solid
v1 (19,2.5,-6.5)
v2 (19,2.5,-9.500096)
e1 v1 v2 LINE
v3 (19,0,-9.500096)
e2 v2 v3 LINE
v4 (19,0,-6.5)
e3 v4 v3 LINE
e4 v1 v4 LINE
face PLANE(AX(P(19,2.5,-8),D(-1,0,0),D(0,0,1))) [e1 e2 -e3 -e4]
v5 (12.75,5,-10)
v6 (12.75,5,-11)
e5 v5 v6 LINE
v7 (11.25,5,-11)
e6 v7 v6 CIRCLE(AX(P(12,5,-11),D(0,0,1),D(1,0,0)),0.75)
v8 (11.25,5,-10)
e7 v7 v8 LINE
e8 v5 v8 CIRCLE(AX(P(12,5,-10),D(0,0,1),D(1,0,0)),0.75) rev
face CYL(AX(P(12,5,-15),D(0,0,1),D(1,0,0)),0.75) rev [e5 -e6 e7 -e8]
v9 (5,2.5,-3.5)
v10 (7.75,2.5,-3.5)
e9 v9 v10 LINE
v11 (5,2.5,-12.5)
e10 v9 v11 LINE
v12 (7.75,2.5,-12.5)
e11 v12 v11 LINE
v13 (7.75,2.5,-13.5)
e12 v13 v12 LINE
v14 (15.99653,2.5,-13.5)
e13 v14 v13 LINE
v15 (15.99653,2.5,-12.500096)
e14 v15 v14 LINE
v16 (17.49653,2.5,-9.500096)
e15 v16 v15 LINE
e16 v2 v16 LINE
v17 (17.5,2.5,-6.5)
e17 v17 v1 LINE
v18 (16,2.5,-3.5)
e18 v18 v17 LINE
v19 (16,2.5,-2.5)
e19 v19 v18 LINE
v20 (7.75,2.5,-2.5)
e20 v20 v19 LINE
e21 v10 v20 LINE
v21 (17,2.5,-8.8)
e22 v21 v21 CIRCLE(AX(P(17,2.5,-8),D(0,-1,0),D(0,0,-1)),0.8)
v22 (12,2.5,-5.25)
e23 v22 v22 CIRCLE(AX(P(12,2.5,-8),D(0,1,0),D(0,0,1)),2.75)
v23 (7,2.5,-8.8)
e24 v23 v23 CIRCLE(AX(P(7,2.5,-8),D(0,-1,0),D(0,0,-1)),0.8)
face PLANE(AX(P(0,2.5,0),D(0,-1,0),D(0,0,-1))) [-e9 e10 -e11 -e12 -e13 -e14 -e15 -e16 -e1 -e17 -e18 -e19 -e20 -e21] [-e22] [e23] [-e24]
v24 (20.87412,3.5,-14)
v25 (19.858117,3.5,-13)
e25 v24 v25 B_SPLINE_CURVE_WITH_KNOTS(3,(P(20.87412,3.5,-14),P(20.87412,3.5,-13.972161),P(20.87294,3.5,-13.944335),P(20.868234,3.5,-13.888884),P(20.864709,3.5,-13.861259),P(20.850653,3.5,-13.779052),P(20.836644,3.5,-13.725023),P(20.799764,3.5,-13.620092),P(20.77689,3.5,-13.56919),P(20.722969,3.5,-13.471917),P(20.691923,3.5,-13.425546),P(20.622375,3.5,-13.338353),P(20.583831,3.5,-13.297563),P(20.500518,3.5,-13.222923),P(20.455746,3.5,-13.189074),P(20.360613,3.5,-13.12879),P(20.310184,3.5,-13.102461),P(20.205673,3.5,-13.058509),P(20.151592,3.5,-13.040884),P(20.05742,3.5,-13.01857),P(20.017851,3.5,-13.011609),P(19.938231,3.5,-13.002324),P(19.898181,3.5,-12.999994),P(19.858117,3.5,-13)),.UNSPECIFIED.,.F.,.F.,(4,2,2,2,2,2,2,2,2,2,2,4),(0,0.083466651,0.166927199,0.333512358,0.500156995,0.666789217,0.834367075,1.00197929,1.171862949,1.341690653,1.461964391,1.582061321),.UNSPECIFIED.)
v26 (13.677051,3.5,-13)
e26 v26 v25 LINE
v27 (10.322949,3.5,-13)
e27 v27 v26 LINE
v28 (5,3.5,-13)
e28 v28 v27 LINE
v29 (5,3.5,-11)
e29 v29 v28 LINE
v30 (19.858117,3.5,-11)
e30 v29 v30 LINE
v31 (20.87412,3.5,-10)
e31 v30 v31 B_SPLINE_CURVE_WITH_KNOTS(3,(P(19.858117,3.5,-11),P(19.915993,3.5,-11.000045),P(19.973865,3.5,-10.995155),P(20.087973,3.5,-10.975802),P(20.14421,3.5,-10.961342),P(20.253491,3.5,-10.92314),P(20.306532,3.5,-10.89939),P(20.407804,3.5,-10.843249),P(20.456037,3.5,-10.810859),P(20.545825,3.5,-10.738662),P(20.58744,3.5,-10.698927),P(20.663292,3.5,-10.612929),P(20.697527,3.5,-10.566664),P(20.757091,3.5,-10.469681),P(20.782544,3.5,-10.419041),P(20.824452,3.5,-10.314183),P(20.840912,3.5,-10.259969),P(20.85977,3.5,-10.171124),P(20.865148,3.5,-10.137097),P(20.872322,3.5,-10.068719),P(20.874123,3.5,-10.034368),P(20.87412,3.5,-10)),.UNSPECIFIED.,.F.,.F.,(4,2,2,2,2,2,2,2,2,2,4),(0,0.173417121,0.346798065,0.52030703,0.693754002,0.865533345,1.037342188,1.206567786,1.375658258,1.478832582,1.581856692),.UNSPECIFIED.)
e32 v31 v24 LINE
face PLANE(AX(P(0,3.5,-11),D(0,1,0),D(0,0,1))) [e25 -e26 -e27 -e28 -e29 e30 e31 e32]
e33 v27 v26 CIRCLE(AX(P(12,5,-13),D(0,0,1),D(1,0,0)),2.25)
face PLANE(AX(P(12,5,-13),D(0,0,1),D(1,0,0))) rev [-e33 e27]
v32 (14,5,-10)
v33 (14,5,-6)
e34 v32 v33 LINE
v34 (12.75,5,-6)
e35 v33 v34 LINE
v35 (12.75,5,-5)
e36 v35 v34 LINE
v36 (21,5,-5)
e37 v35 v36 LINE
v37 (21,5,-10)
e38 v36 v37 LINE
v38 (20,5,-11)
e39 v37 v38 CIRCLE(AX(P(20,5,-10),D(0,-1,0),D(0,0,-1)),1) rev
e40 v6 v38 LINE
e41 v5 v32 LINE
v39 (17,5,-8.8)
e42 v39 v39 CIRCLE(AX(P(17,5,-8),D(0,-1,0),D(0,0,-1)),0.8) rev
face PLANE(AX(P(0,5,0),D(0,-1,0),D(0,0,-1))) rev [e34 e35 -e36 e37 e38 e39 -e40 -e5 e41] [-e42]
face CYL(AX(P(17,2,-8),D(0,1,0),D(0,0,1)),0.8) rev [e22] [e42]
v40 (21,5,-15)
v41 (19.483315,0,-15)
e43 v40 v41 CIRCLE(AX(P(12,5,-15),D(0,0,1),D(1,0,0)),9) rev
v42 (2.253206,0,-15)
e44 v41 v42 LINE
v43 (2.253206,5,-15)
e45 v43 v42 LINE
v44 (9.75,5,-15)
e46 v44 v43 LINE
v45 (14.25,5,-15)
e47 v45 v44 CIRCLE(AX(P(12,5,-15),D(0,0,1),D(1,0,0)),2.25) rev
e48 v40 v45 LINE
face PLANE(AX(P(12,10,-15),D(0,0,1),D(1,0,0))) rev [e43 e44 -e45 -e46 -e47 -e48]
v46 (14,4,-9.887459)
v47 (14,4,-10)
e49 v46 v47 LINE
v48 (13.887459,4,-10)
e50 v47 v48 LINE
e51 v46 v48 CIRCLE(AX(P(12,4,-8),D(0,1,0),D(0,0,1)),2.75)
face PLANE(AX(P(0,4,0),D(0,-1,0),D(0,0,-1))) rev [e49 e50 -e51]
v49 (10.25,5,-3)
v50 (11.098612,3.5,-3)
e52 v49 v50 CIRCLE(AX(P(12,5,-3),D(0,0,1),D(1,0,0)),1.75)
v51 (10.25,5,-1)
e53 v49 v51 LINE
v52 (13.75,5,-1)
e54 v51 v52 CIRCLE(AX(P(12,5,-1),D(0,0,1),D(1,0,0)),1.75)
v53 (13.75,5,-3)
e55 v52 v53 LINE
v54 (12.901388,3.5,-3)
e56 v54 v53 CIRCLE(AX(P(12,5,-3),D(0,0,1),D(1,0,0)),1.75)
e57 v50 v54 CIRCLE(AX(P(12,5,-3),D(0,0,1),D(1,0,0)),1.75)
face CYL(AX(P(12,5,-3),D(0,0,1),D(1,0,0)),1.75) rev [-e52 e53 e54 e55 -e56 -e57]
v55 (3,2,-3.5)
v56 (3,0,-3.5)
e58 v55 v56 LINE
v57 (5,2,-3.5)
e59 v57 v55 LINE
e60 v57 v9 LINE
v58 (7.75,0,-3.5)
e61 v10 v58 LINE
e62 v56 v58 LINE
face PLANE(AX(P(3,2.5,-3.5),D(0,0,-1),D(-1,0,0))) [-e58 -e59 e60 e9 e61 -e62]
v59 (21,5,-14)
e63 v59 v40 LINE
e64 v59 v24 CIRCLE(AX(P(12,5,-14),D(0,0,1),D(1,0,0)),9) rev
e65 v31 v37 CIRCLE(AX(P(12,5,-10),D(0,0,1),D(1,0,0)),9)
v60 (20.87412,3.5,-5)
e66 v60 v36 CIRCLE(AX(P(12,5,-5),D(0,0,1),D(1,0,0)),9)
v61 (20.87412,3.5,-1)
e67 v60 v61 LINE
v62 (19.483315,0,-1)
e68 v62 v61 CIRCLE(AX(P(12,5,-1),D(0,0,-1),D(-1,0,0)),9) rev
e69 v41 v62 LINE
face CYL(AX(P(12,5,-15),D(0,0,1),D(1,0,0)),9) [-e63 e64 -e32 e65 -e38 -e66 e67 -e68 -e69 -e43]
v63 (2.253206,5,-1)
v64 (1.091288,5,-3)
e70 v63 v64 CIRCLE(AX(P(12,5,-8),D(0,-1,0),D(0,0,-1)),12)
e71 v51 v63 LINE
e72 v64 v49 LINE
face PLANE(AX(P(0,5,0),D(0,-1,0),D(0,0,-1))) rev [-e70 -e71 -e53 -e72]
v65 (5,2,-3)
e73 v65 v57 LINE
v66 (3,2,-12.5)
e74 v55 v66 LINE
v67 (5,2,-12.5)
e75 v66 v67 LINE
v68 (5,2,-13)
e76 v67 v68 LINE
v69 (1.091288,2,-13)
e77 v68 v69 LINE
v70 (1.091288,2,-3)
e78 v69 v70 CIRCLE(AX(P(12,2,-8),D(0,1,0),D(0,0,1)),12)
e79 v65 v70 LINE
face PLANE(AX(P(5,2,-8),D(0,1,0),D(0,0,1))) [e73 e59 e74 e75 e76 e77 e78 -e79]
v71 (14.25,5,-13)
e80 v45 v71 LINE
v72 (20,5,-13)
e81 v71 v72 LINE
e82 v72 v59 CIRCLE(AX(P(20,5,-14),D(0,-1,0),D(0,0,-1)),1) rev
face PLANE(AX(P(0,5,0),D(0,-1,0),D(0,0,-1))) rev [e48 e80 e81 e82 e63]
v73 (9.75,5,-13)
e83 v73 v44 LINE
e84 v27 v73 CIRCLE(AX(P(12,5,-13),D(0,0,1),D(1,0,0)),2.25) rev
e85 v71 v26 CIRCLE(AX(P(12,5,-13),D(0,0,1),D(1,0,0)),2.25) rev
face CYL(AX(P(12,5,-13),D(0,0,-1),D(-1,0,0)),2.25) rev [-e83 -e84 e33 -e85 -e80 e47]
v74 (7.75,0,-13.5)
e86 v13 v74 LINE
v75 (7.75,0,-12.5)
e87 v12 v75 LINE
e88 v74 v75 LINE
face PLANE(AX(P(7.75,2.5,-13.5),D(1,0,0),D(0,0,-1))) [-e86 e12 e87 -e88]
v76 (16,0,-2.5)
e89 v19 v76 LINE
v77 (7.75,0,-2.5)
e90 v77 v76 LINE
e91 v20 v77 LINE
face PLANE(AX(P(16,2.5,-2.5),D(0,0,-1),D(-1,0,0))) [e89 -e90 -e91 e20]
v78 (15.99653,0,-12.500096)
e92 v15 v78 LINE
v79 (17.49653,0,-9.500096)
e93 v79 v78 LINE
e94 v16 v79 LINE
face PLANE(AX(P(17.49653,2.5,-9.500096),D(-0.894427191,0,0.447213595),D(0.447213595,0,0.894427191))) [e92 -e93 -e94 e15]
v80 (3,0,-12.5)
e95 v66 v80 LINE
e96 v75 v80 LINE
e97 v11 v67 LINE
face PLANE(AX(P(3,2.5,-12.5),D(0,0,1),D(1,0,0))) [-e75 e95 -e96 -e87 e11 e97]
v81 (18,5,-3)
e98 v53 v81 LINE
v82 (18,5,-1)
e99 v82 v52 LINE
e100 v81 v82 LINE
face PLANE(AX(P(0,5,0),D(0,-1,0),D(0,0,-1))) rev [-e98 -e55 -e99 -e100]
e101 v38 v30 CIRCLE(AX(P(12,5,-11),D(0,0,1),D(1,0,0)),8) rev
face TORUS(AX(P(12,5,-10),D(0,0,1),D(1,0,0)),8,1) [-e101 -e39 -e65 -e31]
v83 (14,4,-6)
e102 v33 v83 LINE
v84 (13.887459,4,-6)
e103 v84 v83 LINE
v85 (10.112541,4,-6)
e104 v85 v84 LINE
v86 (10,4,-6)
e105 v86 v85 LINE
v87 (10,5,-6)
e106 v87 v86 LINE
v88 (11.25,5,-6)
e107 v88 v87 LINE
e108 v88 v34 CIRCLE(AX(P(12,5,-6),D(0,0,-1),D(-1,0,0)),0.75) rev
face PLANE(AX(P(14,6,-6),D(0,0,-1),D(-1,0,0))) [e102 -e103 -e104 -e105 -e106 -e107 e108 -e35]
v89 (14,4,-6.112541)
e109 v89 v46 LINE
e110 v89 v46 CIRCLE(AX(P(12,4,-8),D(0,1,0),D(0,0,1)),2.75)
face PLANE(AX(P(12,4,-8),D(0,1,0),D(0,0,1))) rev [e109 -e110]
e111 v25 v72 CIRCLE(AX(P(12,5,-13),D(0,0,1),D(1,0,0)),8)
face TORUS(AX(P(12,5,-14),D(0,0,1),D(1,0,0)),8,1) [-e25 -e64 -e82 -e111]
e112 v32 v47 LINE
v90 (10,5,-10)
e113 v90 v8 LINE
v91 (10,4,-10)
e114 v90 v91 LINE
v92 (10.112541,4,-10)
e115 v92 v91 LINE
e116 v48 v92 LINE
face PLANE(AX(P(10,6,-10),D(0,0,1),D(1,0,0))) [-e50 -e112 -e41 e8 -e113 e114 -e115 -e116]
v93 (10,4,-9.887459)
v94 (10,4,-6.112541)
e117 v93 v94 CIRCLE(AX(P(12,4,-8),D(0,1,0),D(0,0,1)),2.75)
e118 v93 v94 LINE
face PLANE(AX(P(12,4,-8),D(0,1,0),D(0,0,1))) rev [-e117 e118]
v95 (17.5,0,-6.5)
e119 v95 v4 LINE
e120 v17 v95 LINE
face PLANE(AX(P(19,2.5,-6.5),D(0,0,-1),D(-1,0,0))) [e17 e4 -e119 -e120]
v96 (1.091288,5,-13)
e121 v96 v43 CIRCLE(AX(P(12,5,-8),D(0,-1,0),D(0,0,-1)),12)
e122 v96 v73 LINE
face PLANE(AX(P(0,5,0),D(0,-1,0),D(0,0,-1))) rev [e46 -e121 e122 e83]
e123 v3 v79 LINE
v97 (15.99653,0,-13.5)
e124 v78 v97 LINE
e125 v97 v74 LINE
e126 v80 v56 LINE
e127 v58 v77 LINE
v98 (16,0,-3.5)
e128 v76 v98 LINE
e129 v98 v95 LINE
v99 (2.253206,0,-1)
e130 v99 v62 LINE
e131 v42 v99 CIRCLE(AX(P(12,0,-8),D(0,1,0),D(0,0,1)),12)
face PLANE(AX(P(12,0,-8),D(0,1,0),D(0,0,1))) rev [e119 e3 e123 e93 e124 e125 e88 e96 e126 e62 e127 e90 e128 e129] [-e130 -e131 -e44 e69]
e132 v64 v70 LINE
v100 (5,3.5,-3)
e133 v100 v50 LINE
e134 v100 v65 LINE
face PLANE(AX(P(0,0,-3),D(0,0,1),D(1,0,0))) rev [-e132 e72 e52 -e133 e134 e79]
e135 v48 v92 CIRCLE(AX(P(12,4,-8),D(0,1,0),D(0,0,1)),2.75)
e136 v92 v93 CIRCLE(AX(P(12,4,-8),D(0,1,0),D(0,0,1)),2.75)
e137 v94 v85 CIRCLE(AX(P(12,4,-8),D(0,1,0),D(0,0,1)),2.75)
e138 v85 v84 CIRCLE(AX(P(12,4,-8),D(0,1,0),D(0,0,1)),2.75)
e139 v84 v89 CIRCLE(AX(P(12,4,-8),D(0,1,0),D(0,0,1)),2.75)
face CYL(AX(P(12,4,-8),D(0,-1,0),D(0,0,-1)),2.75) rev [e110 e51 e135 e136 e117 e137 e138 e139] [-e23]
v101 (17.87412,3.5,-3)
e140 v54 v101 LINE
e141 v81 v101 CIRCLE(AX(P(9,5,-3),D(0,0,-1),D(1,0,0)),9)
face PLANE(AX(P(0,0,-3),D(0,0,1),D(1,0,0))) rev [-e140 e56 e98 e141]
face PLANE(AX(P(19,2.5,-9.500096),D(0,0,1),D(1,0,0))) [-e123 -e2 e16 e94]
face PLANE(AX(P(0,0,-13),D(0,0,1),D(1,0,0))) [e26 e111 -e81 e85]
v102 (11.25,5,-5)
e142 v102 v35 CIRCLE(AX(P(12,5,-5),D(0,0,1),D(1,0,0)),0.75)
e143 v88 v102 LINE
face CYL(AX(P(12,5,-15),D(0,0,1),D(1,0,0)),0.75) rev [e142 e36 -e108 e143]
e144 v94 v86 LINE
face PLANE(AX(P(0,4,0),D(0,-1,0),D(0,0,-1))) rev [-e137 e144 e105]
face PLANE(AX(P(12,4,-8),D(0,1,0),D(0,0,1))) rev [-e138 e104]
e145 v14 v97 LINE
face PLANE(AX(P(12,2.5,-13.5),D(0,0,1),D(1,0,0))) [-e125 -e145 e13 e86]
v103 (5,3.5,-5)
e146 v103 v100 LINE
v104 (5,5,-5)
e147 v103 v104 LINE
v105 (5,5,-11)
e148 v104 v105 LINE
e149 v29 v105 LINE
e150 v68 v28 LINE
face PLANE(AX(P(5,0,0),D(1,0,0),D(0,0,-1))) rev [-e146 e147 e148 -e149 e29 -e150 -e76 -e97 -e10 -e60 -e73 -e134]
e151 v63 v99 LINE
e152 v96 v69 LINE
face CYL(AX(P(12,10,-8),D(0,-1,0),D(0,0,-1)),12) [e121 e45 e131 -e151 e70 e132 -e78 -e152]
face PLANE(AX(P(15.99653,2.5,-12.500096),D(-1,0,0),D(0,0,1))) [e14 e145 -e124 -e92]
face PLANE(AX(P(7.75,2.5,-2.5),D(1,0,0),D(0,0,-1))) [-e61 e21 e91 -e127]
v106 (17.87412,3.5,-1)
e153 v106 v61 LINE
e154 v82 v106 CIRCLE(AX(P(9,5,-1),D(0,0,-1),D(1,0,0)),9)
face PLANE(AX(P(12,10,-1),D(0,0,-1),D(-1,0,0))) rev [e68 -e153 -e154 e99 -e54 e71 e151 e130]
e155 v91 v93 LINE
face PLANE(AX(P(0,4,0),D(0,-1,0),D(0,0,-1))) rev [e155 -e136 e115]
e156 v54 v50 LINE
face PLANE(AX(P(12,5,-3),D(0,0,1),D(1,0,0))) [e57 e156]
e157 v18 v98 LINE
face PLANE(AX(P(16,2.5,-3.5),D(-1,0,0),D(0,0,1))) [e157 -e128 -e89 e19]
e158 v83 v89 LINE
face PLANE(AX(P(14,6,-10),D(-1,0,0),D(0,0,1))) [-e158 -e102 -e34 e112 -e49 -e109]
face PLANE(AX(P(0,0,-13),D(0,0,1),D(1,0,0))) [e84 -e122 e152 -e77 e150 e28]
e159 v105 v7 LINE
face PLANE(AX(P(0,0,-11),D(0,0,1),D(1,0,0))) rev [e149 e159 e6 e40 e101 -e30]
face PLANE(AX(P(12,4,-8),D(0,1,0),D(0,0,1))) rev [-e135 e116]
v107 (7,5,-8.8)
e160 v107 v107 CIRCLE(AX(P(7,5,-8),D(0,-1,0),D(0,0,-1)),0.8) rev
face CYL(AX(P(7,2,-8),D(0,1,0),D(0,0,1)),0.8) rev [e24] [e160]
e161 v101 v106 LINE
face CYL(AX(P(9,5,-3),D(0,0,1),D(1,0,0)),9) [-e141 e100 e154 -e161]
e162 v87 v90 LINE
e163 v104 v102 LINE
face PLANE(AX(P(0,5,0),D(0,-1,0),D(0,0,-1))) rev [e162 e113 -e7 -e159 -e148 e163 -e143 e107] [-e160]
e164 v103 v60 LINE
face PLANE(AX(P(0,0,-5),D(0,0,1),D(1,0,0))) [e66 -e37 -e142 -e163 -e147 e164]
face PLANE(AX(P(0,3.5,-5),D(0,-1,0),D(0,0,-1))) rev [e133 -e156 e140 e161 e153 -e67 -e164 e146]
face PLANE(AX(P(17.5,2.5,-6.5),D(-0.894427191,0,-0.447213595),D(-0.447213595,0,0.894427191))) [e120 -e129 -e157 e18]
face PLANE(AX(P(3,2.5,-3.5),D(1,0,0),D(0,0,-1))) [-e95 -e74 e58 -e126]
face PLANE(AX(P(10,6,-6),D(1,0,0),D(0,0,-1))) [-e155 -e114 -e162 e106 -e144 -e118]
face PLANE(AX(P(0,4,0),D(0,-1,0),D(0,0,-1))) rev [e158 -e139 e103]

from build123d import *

# Parameters (mm, degrees)
BOSS_EXTRUDE1_DEPTH = 10
CUT_EXTRUDE3_DEPTH  = 28.676705006
CUT_EXTRUDE6_START  = -13
CUT_EXTRUDE6_DEPTH  = 2
CUT_EXTRUDE14_START = -3
CUT_EXTRUDE14_DEPTH = 2
CUT_EXTRUDE7_START  = 10
SKETCH8_R           = 2.75
CUT_EXTRUDE7_DEPTH  = 2
CUT_EXTRUDE8_START  = -16
SKETCH10_R          = 2.25
CUT_EXTRUDE8_DEPTH  = 3
CUT_EXTRUDE9_DEPTH  = 5
SKETCH18_R          = 0.75
CUT_EXTRUDE12_DEPTH = 28.676705006
CUT_EXTRUDE13_START = 5
SKETCH19_W          = 4
SKETCH19_H          = 4
CUT_EXTRUDE13_DEPTH = 1
CUT_EXTRUDE15_START = -1
SKETCH5_R           = 1.75
CUT_EXTRUDE15_DEPTH = 2
CUT_EXTRUDE16_START = -1
CUT_EXTRUDE16_DEPTH = 2
FILLET2_R           = 0.5
FILLET3_R           = 1
POT_INSERT_DEPTH    = 2.5
POT_START           = 4
SKETCH6_R           = 2.75
POT_HOLE_DEPTH      = 1.5
SCREW_START         = 11
SKETCH14_R          = 0.8
SCREW_HOLES_DEPTH   = 9
SCREW_START_2       = 10
SKETCH15_R          = 1.25
SCREW_HEADS_DEPTH   = 2
CUT_EXTRUDE11_START = 10
SKETCH13_W          = 21
SKETCH13_H          = 15
CUT_EXTRUDE11_DEPTH = 5


with BuildPart() as part:
    # Sketch1 → Boss-Extrude1 (new body)
    with BuildSketch(Plane(origin=(0, 0, 0), x_dir=(1, 0, 0), z_dir=(0, 1, 0))):
        with BuildLine():
            Line((21, 15), (21, 8))
            Line((21, 8), (21, 1))
            Line((21, 1), (12, 1))
            Line((12, 1), (2.253205655, 1))
            ThreePointArc((2.253205655, 1), (0, 8), (2.253205655, 15))
            Line((2.253205655, 15), (12, 15))
            Line((12, 15), (21, 15))
        make_face()
    extrude(amount=BOSS_EXTRUDE1_DEPTH)

    # Sketch4 → Cut-Extrude3 (cut, through all)
    with BuildSketch(Plane.XY):
        with BuildLine():
            Line((21, 14), (12, 14))
            ThreePointArc((12, 14), (18.363961031, 11.363961031), (21, 5))
            Line((21, 5), (21, 14))
        make_face()
        with BuildLine():
            Line((21, -4), (21, 5))
            ThreePointArc((21, 5), (18.363961031, -1.363961031), (12, -4))
            Line((12, -4), (21, -4))
        make_face()
    extrude(amount=-CUT_EXTRUDE3_DEPTH, mode=Mode.SUBTRACT)

    # Sketch7 → Cut-Extrude6 (cut)
    with BuildSketch(Plane.XY.offset(CUT_EXTRUDE6_START)):
        Polygon((21, 5.5), (21, 11), (10, 11), (10, 7.5), (0, 7.5), (0, 3.5), (21, 3.5), align=None)
    extrude(amount=CUT_EXTRUDE6_DEPTH, mode=Mode.SUBTRACT)

    # Sketch21 → Cut-Extrude14 (cut)
    with BuildSketch(Plane.XY.offset(CUT_EXTRUDE14_START)):
        Polygon((21, 5.5), (21, 11), (10, 11), (10, 7.5), (0, 7.5), (0, 3.5), (21, 3.5), align=None)
    extrude(amount=-CUT_EXTRUDE14_DEPTH, mode=Mode.SUBTRACT)

    # Sketch8 → Cut-Extrude7 (cut)
    with BuildSketch(Plane(origin=(0, 0, 0), x_dir=(1, 0, 0), z_dir=(0, 1, 0)).offset(CUT_EXTRUDE7_START)):
        with Locations(Location((12, 8, 0), (0, 0, 270))):
            Circle(SKETCH8_R)
    extrude(amount=-CUT_EXTRUDE7_DEPTH, mode=Mode.SUBTRACT)

    # Sketch10 → Cut-Extrude8 (cut)
    with BuildSketch(Plane.XY.offset(CUT_EXTRUDE8_START)):
        with Locations(Location((12, 5, 0), (0, 0, 221.810314896))):
            Circle(SKETCH10_R)
    extrude(amount=CUT_EXTRUDE8_DEPTH, mode=Mode.SUBTRACT)

    # Sketch11 → Cut-Extrude9 (cut)
    with BuildSketch(Plane(origin=(0, 0, 0), x_dir=(0, 0, -1), z_dir=(1, 0, 0))):
        Polygon((8, 2), (13, 2), (13, 8), (3, 8), (3, 2), align=None)
    extrude(amount=CUT_EXTRUDE9_DEPTH, mode=Mode.SUBTRACT)

    # Sketch18 → Cut-Extrude12 (cut, through all)
    with BuildSketch(Plane.XY):
        with Locations((12, 5)):
            Circle(SKETCH18_R)
    extrude(amount=-CUT_EXTRUDE12_DEPTH, mode=Mode.SUBTRACT)

    # Sketch19 → Cut-Extrude13 (cut, symmetric)
    with BuildSketch(Plane(origin=(0, 0, 0), x_dir=(1, 0, 0), z_dir=(0, 1, 0)).offset(CUT_EXTRUDE13_START)):
        with Locations((12, 8)):
            Rectangle(SKETCH19_W, SKETCH19_H)
    extrude(amount=CUT_EXTRUDE13_DEPTH, both=True, mode=Mode.SUBTRACT)

    # Sketch5 → Cut-Extrude15 (cut)
    with BuildSketch(Plane.XY.offset(CUT_EXTRUDE15_START)):
        with Locations((12, 5)):
            Circle(SKETCH5_R)
    extrude(amount=-CUT_EXTRUDE15_DEPTH, mode=Mode.SUBTRACT)

    # Sketch26 → Cut-Extrude16 (cut)
    with BuildSketch(Plane.XY.offset(CUT_EXTRUDE16_START)):
        with BuildLine():
            Line((16.483314774, 10), (19.483314774, 10))
            ThreePointArc((19.483314774, 10), (20.800790614, 6.883105034), (20.874119675, 3.5))
            Line((20.874119675, 3.5), (17.874119675, 3.5))
            ThreePointArc((17.874119675, 3.5), (17.800790614, 6.883105034), (16.483314774, 10))
        make_face()
    extrude(amount=-CUT_EXTRUDE16_DEPTH, mode=Mode.SUBTRACT)

    # Fillet2
    fillet2_edges = [part.edges().sort_by_distance(p)[0] for p in [
        (12, 8, -10.75),
    ]]
    fillet(fillet2_edges, radius=FILLET2_R)

    # Fillet3
    # the kernel refuses this fillet: 1 mm, written as the material it takes off along each edge
    with BuildSketch(Plane(origin=(12, 5, -13), x_dir=(0.6472427025312245, 0.7622839917118008, 0), z_dir=(-0.7622839917118008, 0.6472427025312245, 0))) as fillet3_piece_1_section:
        with BuildLine():
            CenterArc((9 - FILLET3_R, FILLET3_R), FILLET3_R, 270, 90)
            Line((9 - FILLET3_R, 0), (9, 0))
            Line((9, 0), (9, FILLET3_R))
        make_face()
    fillet3_piece_1 = revolve(axis=Axis((12, 5, -13), (0, 0, -1)), revolution_arc=75.177010416, mode=Mode.PRIVATE)
    fillet3_piece_1 = split(fillet3_piece_1, bisect_by=Plane(origin=(20.22008164, 3.5, -13.28352735), z_dir=(0, 1, 0)), keep=Keep.TOP, mode=Mode.PRIVATE)
    add(fillet3_piece_1, mode=Mode.SUBTRACT)
    with BuildSketch(Plane(origin=(12, 5, -11), x_dir=(0.9025022770828605, -0.43068508200337235, 0), z_dir=(-0.43068508200337235, -0.9025022770828605, 0))) as fillet3_piece_2_section:
        with BuildLine():
            CenterArc((9 - FILLET3_R, FILLET3_R), FILLET3_R, 270, 90)
            Line((9 - FILLET3_R, 0), (9, 0))
            Line((9, 0), (9, FILLET3_R))
        make_face()
    fillet3_piece_2 = revolve(axis=Axis((12, 5, -11), (0, 0, 1)), revolution_arc=75.177010416, mode=Mode.PRIVATE)
    fillet3_piece_2 = split(fillet3_piece_2, bisect_by=Plane(origin=(20.220081643, 3.5, -10.716472653), z_dir=(0, 1, 0)), keep=Keep.TOP, mode=Mode.PRIVATE)
    add(fillet3_piece_2, mode=Mode.SUBTRACT)
    with BuildSketch(Plane(origin=(21.983314774, 10, -11), x_dir=(0, 0, 1), z_dir=(-1, 0, 0))) as fillet3_piece_3:
        with BuildLine():
            CenterArc((FILLET3_R, -FILLET3_R), FILLET3_R, 90, 90)
            Line((0, -FILLET3_R), (0, 0))
            Line((0, 0), (FILLET3_R, 0))
        make_face()
    extrude(amount=11.983314774, mode=Mode.SUBTRACT)
    with BuildSketch(Plane(origin=(21.983314774, 10, -13), x_dir=(0, 0, -1), z_dir=(-1, 0, 0))) as fillet3_piece_4:
        with BuildLine():
            CenterArc((FILLET3_R, FILLET3_R), FILLET3_R, 180, 90)
            Line((0, FILLET3_R), (0, 0))
            Line((0, 0), (FILLET3_R, 0))
        make_face()
    extrude(amount=11.983314774, mode=Mode.SUBTRACT)

    # Sketch3 → Pot Insert (cut)
    with BuildSketch(Plane(origin=(28.28760271, 0, 0), x_dir=(1, 0, 0), z_dir=(0, 1, 0))):
        Polygon((-25.28760271, 12.5), (-20.53760271, 12.5), (-20.53760271, 13.5), (-16.28760271, 13.5), (-12.291072924, 13.5), (-12.291072924, 12.500096395), (-10.791072924, 9.500096395), (-9.28760271, 9.500096395), (-9.28760271, 8), (-9.28760271, 6.5), (-10.78760271, 6.5), (-12.28760271, 3.5), (-12.28760271, 2.5), (-16.28760271, 2.5), (-20.53760271, 2.5), (-20.53760271, 3.5), (-25.28760271, 3.5), (-25.28760271, 8), align=None)
    extrude(amount=POT_INSERT_DEPTH, mode=Mode.SUBTRACT)

    # Sketch6 → Pot Hole (cut)
    with BuildSketch(Plane(origin=(0, 0, 0), x_dir=(1, 0, 0), z_dir=(0, 1, 0)).offset(POT_START)):
        with Locations(Location((12, 8, 0), (0, 0, 270))):
            Circle(SKETCH6_R)
    extrude(amount=-POT_HOLE_DEPTH, mode=Mode.SUBTRACT)

    # Sketch14 → Screw Holes (cut)
    with BuildSketch(Plane(origin=(0, 0, 0), x_dir=(1, 0, 0), z_dir=(0, 1, 0)).offset(SCREW_START)):
        with Locations(Location((7, 8, 0), (0, 0, 270))):
            Circle(SKETCH14_R)
        with Locations(Location((17, 8, 0), (0, 0, 270))):
            Circle(SKETCH14_R)
    extrude(amount=-SCREW_HOLES_DEPTH, mode=Mode.SUBTRACT)

    # Sketch15 → Screw Heads (cut)
    with BuildSketch(Plane(origin=(0, 0, 0), x_dir=(1, 0, 0), z_dir=(0, 1, 0)).offset(SCREW_START_2)):
        with Locations(Location((7, 8, 0), (0, 0, 270))):
            Circle(SKETCH15_R)
        with Locations(Location((17, 8, 0), (0, 0, 270))):
            Circle(SKETCH15_R)
    extrude(amount=-SCREW_HEADS_DEPTH, mode=Mode.SUBTRACT)

    # Sketch13 → Cut-Extrude11 (cut)
    with BuildSketch(Plane(origin=(0, 0, 0), x_dir=(1, 0, 0), z_dir=(0, 1, 0)).offset(CUT_EXTRUDE11_START)):
        with Locations((10.5, 7.5)):
            Rectangle(SKETCH13_W, SKETCH13_H)
    extrude(amount=-CUT_EXTRUDE11_DEPTH, mode=Mode.SUBTRACT)


solid = part.part
